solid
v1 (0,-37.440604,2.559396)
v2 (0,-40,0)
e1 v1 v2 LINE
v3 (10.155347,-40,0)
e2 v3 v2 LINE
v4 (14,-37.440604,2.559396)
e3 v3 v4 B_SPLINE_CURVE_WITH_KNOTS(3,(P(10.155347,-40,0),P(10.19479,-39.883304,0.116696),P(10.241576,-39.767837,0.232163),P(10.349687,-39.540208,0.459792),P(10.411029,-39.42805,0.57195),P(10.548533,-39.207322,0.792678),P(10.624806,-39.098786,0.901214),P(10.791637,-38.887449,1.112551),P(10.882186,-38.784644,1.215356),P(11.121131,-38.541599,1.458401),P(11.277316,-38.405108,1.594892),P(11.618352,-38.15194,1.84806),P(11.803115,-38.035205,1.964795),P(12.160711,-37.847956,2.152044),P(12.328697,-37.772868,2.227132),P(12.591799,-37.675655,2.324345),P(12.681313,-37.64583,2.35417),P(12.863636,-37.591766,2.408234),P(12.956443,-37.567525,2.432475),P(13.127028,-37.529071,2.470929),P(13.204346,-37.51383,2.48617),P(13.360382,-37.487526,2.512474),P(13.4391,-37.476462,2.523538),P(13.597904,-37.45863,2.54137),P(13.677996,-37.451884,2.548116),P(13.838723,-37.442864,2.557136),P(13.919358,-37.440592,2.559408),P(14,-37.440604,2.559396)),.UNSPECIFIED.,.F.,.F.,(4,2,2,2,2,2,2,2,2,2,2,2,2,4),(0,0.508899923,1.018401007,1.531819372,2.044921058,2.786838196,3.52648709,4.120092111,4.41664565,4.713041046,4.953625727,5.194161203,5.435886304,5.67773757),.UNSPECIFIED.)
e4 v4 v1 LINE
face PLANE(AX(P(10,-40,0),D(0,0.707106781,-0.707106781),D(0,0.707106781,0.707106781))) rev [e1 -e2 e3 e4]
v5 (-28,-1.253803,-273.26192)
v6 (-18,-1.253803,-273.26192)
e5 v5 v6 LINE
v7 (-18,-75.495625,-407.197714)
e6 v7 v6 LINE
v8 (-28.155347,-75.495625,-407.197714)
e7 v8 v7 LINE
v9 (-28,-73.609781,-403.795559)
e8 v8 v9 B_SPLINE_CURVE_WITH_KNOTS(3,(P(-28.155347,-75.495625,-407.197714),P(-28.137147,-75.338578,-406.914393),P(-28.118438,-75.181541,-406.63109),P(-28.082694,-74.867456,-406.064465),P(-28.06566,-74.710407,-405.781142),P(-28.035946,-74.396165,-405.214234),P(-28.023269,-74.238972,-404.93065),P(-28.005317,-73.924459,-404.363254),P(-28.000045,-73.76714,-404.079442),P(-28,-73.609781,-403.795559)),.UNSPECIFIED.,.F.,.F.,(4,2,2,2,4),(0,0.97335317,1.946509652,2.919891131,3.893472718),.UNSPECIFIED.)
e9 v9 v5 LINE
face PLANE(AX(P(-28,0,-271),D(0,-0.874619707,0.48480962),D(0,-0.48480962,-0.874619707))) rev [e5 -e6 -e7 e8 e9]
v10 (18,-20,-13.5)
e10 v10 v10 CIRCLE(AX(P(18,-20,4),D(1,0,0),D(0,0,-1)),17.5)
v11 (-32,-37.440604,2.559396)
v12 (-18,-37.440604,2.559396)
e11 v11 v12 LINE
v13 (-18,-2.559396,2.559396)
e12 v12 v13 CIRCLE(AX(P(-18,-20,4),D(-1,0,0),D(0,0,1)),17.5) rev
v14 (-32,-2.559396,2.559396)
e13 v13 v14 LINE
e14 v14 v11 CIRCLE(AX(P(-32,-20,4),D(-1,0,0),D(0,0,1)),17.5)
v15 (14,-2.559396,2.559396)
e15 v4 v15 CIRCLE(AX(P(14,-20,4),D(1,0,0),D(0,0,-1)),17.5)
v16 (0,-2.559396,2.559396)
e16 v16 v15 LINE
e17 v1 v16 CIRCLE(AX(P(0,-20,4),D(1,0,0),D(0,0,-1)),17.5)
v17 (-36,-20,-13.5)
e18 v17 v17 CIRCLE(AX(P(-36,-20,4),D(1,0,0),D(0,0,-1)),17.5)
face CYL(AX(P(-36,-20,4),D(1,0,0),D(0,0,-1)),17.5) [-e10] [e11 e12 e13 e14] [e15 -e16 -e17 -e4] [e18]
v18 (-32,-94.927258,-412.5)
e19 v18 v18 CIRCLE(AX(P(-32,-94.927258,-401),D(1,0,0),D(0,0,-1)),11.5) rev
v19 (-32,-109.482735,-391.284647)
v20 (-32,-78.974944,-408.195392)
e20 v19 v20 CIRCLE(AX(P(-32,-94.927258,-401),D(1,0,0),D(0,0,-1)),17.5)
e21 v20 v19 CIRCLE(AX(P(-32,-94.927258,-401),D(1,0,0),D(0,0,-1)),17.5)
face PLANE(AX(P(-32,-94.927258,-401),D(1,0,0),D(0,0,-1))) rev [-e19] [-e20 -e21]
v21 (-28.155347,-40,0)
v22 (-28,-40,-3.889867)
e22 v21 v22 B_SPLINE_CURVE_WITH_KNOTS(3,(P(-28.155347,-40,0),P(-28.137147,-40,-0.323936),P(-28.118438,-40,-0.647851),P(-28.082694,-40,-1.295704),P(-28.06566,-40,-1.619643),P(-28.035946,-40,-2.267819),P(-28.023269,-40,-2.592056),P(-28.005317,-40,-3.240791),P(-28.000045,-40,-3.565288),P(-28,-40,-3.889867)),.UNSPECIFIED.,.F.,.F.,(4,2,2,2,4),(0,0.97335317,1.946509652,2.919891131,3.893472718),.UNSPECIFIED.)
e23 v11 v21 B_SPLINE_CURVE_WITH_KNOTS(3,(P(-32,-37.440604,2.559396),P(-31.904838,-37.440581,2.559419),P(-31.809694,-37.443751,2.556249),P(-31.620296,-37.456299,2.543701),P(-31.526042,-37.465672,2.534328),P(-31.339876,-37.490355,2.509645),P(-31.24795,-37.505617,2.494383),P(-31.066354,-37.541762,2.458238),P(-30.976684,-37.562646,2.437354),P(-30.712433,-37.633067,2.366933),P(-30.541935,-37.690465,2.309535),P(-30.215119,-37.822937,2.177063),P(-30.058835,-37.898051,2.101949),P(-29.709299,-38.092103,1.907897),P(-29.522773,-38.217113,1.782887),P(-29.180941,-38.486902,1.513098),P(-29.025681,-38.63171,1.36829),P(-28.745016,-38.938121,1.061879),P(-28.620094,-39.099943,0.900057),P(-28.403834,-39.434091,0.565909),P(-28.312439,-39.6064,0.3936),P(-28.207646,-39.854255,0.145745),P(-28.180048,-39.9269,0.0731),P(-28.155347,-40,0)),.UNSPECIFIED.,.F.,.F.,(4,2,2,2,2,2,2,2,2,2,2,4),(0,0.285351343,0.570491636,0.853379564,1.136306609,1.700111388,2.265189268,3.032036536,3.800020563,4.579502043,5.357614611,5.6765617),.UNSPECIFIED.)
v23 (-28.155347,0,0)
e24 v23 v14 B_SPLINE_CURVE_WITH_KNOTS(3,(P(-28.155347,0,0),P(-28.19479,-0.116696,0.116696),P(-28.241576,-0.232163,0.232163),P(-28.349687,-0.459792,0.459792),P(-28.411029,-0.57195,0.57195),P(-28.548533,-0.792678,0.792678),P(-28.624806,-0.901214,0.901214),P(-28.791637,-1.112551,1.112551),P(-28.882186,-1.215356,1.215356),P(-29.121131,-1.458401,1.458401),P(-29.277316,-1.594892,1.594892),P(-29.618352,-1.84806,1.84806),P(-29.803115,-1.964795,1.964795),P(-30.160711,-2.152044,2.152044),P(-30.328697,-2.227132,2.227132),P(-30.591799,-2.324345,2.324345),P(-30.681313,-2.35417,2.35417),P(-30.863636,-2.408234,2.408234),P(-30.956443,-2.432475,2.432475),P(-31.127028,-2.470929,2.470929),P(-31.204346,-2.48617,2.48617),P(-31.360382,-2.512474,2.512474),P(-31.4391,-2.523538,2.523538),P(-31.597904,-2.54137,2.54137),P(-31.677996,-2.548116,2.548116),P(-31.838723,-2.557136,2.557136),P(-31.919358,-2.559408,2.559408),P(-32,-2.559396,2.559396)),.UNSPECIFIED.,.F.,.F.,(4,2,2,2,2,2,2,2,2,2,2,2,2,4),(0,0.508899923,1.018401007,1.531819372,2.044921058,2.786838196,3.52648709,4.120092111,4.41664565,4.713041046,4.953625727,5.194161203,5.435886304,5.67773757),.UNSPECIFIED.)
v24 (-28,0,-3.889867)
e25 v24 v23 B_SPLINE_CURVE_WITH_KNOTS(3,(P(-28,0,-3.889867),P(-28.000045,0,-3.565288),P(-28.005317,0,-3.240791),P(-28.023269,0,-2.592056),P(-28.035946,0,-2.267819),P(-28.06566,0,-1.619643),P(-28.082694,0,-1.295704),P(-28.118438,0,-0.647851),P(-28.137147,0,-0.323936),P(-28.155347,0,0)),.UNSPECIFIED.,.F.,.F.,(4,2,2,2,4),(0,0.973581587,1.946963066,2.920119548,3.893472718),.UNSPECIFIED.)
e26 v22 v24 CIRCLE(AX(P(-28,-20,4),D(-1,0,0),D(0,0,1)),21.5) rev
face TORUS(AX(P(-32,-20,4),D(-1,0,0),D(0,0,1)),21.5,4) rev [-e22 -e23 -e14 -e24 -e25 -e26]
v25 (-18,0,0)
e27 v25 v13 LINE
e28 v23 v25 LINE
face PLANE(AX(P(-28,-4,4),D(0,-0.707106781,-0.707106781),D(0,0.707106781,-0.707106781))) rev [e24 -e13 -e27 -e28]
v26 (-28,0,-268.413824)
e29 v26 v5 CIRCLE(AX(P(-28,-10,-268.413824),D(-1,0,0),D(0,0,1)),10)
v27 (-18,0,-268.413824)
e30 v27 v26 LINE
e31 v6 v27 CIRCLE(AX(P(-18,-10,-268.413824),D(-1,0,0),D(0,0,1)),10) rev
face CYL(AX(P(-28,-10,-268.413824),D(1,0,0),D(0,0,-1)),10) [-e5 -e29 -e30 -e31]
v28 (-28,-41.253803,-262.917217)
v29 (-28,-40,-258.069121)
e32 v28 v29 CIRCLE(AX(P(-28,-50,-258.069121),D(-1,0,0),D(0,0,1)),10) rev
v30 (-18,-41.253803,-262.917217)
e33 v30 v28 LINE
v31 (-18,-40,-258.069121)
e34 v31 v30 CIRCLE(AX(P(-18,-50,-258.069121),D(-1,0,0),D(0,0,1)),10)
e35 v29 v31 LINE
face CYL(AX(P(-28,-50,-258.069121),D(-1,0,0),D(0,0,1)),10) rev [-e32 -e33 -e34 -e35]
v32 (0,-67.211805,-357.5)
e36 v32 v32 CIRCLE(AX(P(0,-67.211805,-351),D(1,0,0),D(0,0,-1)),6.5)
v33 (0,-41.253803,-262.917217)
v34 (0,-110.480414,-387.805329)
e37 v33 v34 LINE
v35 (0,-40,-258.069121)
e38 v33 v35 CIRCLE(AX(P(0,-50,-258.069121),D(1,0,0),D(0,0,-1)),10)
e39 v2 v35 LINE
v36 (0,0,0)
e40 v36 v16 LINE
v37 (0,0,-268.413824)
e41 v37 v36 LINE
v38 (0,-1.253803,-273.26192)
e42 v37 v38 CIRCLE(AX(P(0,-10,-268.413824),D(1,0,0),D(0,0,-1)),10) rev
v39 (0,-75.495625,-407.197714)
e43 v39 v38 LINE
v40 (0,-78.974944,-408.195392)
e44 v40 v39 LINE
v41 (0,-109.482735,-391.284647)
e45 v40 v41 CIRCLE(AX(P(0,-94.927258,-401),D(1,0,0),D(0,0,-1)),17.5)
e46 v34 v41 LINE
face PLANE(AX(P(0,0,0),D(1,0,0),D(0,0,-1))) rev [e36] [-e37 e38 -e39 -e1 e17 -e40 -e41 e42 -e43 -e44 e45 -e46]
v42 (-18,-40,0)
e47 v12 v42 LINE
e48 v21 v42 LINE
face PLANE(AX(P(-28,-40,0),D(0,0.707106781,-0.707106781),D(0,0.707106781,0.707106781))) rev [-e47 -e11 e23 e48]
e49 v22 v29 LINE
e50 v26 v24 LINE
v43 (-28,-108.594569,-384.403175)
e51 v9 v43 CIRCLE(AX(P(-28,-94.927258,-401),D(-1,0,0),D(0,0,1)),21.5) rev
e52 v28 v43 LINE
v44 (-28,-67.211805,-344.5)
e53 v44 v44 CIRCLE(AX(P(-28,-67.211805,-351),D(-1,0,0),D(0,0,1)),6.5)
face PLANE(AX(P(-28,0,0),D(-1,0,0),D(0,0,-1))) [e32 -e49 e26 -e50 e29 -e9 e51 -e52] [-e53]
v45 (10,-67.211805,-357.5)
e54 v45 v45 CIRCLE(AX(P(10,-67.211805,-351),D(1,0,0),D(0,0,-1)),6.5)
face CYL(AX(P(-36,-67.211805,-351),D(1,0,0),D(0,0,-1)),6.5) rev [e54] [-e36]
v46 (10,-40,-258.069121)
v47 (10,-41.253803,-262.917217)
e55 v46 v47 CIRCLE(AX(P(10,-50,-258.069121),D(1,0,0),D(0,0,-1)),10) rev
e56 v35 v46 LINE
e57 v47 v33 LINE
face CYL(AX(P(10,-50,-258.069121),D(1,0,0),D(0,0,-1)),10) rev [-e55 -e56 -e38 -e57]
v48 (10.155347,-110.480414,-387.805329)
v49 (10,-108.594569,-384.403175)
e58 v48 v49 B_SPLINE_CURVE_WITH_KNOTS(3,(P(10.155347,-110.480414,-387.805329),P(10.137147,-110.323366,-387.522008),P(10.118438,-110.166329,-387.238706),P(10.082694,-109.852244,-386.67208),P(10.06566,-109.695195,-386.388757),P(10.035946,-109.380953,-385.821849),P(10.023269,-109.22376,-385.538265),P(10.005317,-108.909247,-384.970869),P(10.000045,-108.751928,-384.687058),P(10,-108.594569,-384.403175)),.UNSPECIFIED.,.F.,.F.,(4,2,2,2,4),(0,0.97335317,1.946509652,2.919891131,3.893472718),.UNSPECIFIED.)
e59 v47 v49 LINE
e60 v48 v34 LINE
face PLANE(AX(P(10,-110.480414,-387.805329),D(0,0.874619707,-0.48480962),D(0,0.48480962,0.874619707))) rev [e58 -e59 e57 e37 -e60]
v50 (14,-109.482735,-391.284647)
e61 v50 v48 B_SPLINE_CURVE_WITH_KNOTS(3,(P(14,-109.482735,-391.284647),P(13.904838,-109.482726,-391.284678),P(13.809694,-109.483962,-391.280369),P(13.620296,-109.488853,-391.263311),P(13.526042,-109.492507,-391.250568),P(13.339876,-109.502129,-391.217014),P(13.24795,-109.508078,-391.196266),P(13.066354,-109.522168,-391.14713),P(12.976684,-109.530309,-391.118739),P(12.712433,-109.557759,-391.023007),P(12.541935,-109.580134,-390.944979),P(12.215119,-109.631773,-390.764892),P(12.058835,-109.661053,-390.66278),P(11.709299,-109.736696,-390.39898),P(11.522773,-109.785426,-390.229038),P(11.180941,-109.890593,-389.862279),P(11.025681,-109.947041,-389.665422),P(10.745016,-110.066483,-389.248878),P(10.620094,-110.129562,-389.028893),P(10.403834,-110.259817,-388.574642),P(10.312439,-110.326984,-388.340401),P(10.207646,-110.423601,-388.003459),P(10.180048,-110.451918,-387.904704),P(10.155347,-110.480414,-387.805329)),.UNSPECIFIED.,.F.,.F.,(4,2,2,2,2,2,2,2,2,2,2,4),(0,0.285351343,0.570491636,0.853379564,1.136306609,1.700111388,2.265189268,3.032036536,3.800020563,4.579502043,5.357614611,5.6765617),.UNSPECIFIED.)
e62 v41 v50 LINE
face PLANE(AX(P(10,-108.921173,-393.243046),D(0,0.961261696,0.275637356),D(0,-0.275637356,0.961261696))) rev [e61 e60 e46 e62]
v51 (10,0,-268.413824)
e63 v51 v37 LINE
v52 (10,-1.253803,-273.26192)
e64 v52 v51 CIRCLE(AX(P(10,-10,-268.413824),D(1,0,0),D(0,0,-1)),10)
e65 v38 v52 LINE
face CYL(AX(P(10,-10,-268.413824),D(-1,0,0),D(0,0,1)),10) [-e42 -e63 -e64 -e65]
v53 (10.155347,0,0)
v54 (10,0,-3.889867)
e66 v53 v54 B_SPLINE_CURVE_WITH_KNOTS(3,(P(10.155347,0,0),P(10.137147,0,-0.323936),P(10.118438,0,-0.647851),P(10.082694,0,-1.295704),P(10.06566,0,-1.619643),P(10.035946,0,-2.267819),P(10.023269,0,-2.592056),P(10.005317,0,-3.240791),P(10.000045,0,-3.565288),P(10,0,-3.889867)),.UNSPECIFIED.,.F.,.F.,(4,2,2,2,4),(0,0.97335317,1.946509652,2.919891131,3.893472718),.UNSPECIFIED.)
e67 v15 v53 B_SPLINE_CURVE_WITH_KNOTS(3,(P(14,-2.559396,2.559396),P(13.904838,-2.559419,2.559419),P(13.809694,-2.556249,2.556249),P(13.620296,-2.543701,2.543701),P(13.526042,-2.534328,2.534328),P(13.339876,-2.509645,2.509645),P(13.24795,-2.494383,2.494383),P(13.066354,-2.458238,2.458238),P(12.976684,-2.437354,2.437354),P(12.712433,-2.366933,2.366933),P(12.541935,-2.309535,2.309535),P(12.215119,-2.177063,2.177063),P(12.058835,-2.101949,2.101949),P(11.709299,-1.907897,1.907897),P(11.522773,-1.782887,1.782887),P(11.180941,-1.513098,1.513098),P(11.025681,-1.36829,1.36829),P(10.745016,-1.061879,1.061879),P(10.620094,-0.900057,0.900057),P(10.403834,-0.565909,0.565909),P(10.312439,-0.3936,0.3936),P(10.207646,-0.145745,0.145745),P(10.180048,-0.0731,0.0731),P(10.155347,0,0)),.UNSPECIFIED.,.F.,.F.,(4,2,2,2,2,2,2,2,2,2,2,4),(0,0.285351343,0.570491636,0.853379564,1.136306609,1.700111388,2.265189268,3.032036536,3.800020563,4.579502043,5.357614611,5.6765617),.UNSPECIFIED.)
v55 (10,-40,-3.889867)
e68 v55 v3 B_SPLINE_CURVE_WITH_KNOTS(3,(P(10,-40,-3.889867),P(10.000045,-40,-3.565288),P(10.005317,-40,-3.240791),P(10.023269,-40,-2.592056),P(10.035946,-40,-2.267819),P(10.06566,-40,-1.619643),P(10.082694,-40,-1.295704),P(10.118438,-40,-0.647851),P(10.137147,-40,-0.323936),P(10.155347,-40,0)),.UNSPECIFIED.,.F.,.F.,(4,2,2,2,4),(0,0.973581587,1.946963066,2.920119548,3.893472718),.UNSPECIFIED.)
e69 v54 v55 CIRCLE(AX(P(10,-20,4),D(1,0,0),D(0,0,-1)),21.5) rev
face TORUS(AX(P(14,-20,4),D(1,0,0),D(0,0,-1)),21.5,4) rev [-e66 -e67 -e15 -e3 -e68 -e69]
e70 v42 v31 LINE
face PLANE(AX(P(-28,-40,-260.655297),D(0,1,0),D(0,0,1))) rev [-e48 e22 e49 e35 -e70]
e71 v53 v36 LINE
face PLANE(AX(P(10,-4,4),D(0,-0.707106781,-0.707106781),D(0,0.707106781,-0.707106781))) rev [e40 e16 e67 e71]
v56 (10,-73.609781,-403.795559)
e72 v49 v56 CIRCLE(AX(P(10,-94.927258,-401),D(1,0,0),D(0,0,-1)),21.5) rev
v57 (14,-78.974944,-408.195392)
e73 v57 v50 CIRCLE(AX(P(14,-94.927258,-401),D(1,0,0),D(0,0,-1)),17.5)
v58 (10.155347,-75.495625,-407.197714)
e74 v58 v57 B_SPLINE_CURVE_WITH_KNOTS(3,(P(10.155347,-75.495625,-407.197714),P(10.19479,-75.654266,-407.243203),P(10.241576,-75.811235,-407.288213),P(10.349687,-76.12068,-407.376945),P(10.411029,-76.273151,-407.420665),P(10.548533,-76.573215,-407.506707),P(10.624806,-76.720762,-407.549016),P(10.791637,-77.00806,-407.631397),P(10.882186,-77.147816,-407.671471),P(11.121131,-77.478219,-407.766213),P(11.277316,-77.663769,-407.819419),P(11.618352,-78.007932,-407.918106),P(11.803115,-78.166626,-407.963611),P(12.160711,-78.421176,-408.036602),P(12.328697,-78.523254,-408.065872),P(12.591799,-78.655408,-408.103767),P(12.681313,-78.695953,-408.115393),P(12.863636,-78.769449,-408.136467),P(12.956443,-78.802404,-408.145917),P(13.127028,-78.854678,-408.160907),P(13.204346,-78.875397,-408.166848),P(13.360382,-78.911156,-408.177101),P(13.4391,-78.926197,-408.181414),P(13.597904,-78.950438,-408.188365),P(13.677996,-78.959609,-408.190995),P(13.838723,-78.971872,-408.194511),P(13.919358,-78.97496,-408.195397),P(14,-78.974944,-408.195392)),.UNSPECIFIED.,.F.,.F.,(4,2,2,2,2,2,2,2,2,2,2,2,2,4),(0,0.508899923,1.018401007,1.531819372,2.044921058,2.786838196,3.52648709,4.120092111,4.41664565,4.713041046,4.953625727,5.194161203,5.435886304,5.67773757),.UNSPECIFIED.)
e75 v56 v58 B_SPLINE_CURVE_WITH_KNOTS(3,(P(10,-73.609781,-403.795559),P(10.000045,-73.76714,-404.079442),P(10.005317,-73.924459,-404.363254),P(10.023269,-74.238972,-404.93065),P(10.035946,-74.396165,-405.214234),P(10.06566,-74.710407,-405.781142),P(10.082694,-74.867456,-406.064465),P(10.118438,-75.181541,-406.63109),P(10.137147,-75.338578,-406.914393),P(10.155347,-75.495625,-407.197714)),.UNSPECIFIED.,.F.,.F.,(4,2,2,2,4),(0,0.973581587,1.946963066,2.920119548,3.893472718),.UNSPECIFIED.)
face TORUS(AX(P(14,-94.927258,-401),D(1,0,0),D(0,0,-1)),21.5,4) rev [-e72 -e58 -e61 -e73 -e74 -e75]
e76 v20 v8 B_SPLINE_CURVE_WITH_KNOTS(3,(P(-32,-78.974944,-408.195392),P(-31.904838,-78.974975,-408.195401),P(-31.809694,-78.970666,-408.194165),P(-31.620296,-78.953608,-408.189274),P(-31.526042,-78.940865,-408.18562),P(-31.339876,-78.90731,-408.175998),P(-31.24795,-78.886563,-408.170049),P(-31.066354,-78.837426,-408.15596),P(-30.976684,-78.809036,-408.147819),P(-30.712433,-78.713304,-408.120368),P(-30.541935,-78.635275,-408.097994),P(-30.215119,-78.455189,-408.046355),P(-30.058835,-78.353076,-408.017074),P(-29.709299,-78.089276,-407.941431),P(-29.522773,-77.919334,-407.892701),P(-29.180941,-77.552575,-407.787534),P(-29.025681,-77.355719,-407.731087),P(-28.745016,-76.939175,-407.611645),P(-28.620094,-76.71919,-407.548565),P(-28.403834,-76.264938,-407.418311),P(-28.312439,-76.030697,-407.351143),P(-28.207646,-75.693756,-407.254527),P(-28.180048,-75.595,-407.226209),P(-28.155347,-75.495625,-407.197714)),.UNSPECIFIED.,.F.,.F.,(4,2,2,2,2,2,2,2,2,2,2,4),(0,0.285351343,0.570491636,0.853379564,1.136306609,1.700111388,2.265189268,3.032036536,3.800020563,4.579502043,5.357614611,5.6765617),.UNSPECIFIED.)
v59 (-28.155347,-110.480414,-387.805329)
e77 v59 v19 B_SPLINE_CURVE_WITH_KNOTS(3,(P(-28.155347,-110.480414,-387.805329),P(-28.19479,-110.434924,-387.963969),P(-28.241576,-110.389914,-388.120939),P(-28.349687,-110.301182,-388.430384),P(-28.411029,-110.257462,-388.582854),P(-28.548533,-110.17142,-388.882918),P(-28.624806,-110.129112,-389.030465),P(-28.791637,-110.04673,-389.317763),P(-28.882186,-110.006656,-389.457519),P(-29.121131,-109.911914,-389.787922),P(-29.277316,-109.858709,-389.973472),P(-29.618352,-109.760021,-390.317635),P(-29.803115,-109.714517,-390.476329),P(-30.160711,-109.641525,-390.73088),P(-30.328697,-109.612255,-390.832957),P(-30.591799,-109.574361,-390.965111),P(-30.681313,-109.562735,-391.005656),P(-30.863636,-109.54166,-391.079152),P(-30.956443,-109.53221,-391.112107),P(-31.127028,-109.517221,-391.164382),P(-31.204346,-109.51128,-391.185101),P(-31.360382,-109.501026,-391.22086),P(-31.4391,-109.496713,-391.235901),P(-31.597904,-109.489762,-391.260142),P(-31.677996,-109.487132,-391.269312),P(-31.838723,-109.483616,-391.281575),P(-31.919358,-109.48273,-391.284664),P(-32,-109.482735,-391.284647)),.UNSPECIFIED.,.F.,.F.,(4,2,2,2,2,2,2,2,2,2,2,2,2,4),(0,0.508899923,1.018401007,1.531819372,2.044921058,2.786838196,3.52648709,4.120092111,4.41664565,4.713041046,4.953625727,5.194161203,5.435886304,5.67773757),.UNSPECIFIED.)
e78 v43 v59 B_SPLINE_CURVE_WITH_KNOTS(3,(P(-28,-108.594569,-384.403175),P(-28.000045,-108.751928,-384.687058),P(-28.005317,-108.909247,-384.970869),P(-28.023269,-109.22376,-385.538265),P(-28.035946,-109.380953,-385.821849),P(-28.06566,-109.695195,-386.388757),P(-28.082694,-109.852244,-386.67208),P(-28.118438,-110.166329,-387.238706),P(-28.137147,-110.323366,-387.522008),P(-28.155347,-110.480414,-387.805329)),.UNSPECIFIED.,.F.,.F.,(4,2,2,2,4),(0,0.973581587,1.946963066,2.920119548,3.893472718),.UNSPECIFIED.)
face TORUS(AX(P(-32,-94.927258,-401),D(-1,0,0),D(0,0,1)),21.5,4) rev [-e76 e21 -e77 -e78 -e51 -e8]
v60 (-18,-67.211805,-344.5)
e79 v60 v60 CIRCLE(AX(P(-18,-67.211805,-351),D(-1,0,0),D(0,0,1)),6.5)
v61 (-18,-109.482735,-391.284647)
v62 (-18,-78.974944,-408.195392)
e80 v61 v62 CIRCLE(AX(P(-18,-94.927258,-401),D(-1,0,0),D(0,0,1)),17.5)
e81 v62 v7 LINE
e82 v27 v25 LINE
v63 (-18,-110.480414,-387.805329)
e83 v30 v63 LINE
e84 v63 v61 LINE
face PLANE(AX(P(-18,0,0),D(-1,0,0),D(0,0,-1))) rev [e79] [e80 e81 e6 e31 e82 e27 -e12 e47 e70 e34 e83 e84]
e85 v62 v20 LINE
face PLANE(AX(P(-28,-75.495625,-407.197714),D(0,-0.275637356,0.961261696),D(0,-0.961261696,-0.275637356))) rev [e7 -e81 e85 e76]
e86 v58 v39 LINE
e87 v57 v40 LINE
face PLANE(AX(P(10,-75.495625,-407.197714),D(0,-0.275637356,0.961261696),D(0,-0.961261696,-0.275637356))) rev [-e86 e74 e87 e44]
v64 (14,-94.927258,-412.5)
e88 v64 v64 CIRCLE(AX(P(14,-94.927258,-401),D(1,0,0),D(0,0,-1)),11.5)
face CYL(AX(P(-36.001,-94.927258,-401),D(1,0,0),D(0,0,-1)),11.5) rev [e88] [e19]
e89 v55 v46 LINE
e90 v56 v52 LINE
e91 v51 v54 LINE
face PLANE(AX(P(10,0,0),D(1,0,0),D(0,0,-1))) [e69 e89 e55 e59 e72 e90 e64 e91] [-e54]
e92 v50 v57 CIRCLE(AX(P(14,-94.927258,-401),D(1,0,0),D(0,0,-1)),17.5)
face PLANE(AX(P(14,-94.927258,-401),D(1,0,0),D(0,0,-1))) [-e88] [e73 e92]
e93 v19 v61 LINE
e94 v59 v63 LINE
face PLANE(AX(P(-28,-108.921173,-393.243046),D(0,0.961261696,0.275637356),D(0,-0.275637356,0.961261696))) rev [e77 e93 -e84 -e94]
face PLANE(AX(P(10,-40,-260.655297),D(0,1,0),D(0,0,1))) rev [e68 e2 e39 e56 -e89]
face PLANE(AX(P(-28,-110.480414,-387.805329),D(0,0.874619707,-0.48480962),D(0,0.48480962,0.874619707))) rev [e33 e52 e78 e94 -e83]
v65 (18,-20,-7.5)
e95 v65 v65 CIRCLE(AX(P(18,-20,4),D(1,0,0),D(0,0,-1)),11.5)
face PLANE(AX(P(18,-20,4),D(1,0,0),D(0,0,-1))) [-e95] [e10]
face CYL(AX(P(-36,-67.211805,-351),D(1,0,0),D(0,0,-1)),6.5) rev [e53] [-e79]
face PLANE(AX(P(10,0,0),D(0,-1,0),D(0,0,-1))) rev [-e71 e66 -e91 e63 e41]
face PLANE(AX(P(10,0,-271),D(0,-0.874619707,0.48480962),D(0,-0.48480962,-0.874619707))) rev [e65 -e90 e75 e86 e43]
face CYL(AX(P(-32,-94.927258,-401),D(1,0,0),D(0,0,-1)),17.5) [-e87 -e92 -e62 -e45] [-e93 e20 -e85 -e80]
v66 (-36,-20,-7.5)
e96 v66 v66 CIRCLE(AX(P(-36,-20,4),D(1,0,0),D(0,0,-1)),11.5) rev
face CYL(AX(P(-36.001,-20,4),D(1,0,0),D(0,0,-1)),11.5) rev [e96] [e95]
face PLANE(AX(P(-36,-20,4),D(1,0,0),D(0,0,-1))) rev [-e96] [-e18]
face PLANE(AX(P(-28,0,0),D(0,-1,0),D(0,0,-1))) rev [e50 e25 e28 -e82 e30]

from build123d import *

# Parameters (mm, degrees)
DODANIE_WYCI_GNI_CIE1_DEPTH      = 10
DODANIE_WYCI_GNI_CIE2_DEPTH      = 8
DODANIE_WYCI_GNI_CIE2_DEPTH_BACK = 46
SZKIC2_R                         = 17.5
DODANIE_WYCI_GNI_CIE3_DEPTH      = 4
DODANIE_WYCI_GNI_CIE3_DEPTH_BACK = 42
SZKIC3_R                         = 17.5
WYTNIJ_WYCI_GNI_CIE1_REACH       = 438.69
SZKIC4_R                         = 11.5
WYTNIJ_WYCI_GNI_CIE2_REACH       = 438.213
SZKIC5_R                         = 11.5
ZAOKR_GLENIE1_R                  = 4
ZAOKR_GLENIE2_R                  = 10
SZKIC7_R                         = 6.5
WYTNIJ_WYCI_GNI_CIE3_DEPTH       = 436.773035366


with BuildPart() as part:
    # Szkic1 → Dodanie-wyciągnięcie1 (new body)
    with BuildSketch(Plane(origin=(0, 0, 0), x_dir=(0, 0, -1), z_dir=(1, 0, 0))):
        Polygon((0, 0), (271, 0), (407.197713576, -75.495625423), (408.756953924, -80.933342732), (393.243046076, -108.921173361), (387.805328767, -110.480413708), (260.655296626, -40), (0, -40), (-4, -36), (-4, -4), align=None)
    extrude(amount=DODANIE_WYCI_GNI_CIE1_DEPTH)


with BuildPart() as body_2:
    # Lustro3: mirrored copy
    add(part.part.mirror(Plane.ZY.offset(9)))


with BuildPart() as part_1:
    add(part.part)

    add(body_2.part)  # Dodanie-wyciągnięcie2 merges body 2
    # Szkic2 → Dodanie-wyciągnięcie2 (add, two sides: drawn at the far end of the back side and taken through both)
    with BuildSketch(Plane(origin=(10, 0, 0), x_dir=(0, 0, -1), z_dir=(1, 0, 0)).offset(-DODANIE_WYCI_GNI_CIE2_DEPTH_BACK)):
        with Locations((-4, -20)):
            Circle(SZKIC2_R)
    extrude(amount=DODANIE_WYCI_GNI_CIE2_DEPTH + DODANIE_WYCI_GNI_CIE2_DEPTH_BACK)

    # Szkic3 → Dodanie-wyciągnięcie3 (add, two sides: drawn at the far end of the back side and taken through both)
    with BuildSketch(Plane(origin=(10, 0, 0), x_dir=(0, 0, -1), z_dir=(1, 0, 0)).offset(-DODANIE_WYCI_GNI_CIE3_DEPTH_BACK)):
        with Locations((401, -94.927258046)):
            Circle(SZKIC3_R)
    extrude(amount=DODANIE_WYCI_GNI_CIE3_DEPTH + DODANIE_WYCI_GNI_CIE3_DEPTH_BACK)

    # Szkic4 → Wytnij-wyciągnięcie1 (cut, up to next)
    with BuildSketch(Plane(origin=(18, 0, 0), x_dir=(0, 0, -1), z_dir=(1, 0, 0)), mode=Mode.PRIVATE) as wytnij_wyci_gni_cie1_sk1:
        with Locations((-4, -20)):
            Circle(SZKIC4_R)
    wytnij_wyci_gni_cie1_tool1 = extrude(wytnij_wyci_gni_cie1_sk1.sketch, amount=-WYTNIJ_WYCI_GNI_CIE1_REACH, mode=Mode.PRIVATE) & part_1.part
    add(wytnij_wyci_gni_cie1_tool1.solids().sort_by_distance((18, -20, 4))[0], mode=Mode.SUBTRACT)

    # Szkic5 → Wytnij-wyciągnięcie2 (cut, up to next)
    with BuildSketch(Plane(origin=(14, 0, 0), x_dir=(0, 0, -1), z_dir=(1, 0, 0)), mode=Mode.PRIVATE) as wytnij_wyci_gni_cie2_sk1:
        with Locations((401, -94.927258046)):
            Circle(SZKIC5_R)
    wytnij_wyci_gni_cie2_tool1 = extrude(wytnij_wyci_gni_cie2_sk1.sketch, amount=-WYTNIJ_WYCI_GNI_CIE2_REACH, mode=Mode.PRIVATE) & part_1.part
    add(wytnij_wyci_gni_cie2_tool1.solids().sort_by_distance((14, -94.927258, -401))[0], mode=Mode.SUBTRACT)

    # Zaokrąglenie1
    # the kernel refuses this fillet: 4 mm, written as the material it adds along each edge
    with BuildSketch(Plane(origin=(-28, -94.927258046, -401), x_dir=(0, 0.5436759874947165, -0.8392951927788249), z_dir=(0, -0.8392951927788249, -0.5436759874947165))) as zaokr_glenie1_piece_1_section:
        with BuildLine():
            CenterArc((17.5 + ZAOKR_GLENIE1_R, -ZAOKR_GLENIE1_R), ZAOKR_GLENIE1_R, 90, 90)
            Line((17.5 + ZAOKR_GLENIE1_R, 0), (17.5, 0))
            Line((17.5, 0), (17.5, -ZAOKR_GLENIE1_R))
        make_face()
    zaokr_glenie1_piece_1 = revolve(axis=Axis((-28, -94.927258046, -401), (1, 0, 0)), revolution_arc=236.131536778, mode=Mode.PRIVATE)
    zaokr_glenie1_piece_1 = split(zaokr_glenie1_piece_1, bisect_by=Plane(origin=(-29.129078487, -79.146319532, -408.244533267), z_dir=(0, -0.27563735581700194, 0.9612616959383181)), keep=Keep.TOP, mode=Mode.PRIVATE)
    zaokr_glenie1_piece_1 = split(zaokr_glenie1_piece_1, bisect_by=Plane(origin=(-29.129078487, -109.433594017, -391.456022876), z_dir=(0, 0.961261695938321, 0.2756373558169916)), keep=Keep.TOP, mode=Mode.PRIVATE)
    zaokr_glenie1_piece_1 = split(zaokr_glenie1_piece_1, bisect_by=Plane(origin=(-29.129078487, -103.388095722, -375.010448424), z_dir=(0, 0.8746197071393952, -0.4848096202463382)), keep=Keep.TOP, mode=Mode.PRIVATE)
    zaokr_glenie1_piece_1 = split(zaokr_glenie1_piece_1, bisect_by=Plane(origin=(-29.129078487, -68.403307437, -394.402833234), z_dir=(0, -0.8746197071393943, 0.4848096202463399)), keep=Keep.TOP, mode=Mode.PRIVATE)
    add(zaokr_glenie1_piece_1)
    with BuildSketch(Plane(origin=(-28, -20, 4), x_dir=(0, -0.8826991233352643, 0.469938567967299), z_dir=(0, 0.469938567967299, 0.8826991233352643))) as zaokr_glenie1_piece_2_section:
        with BuildLine():
            CenterArc((17.5 + ZAOKR_GLENIE1_R, -ZAOKR_GLENIE1_R), ZAOKR_GLENIE1_R, 90, 90)
            Line((17.5 + ZAOKR_GLENIE1_R, 0), (17.5, 0))
            Line((17.5, 0), (17.5, -ZAOKR_GLENIE1_R))
        make_face()
    zaokr_glenie1_piece_2 = revolve(axis=Axis((-28, -20, 4), (1, 0, 0)), revolution_arc=118.030308923, mode=Mode.PRIVATE)
    zaokr_glenie1_piece_2 = split(zaokr_glenie1_piece_2, bisect_by=Plane(origin=(-29.137845044, -41.167759306, -1.167759306), z_dir=(0, 0.7071067811865419, -0.7071067811865531)), keep=Keep.TOP, mode=Mode.PRIVATE)
    zaokr_glenie1_piece_2 = split(zaokr_glenie1_piece_2, bisect_by=Plane(origin=(-29.137845044, -40, -9.710667039), z_dir=(0, 1, 0)), keep=Keep.TOP, mode=Mode.PRIVATE)
    add(zaokr_glenie1_piece_2)
    with BuildSketch(Plane(origin=(10, -20, 4), x_dir=(0, -0.8826991233352602, 0.46993856796730693), z_dir=(0, 0.46993856796730693, 0.8826991233352602))) as zaokr_glenie1_piece_3_section:
        with BuildLine():
            CenterArc((17.5 + ZAOKR_GLENIE1_R, ZAOKR_GLENIE1_R), ZAOKR_GLENIE1_R, 180, 90)
            Line((17.5, ZAOKR_GLENIE1_R), (17.5, 0))
            Line((17.5, 0), (17.5 + ZAOKR_GLENIE1_R, 0))
        make_face()
    zaokr_glenie1_piece_3 = revolve(axis=Axis((10, -20, 4), (1, 0, 0)), revolution_arc=118.030308923, mode=Mode.PRIVATE)
    zaokr_glenie1_piece_3 = split(zaokr_glenie1_piece_3, bisect_by=Plane(origin=(11.137845044, -41.167759305, -1.167759305), z_dir=(0, 0.7071067811865419, -0.7071067811865531)), keep=Keep.TOP, mode=Mode.PRIVATE)
    zaokr_glenie1_piece_3 = split(zaokr_glenie1_piece_3, bisect_by=Plane(origin=(11.137845044, -40, -9.710667039), z_dir=(0, 1, 0)), keep=Keep.TOP, mode=Mode.PRIVATE)
    add(zaokr_glenie1_piece_3)
    with BuildSketch(Plane(origin=(10, -94.927258046, -401), x_dir=(0, 0.5436759874947362, -0.8392951927788123), z_dir=(0, -0.8392951927788123, -0.5436759874947362))) as zaokr_glenie1_piece_4_section:
        with BuildLine():
            CenterArc((17.5 + ZAOKR_GLENIE1_R, ZAOKR_GLENIE1_R), ZAOKR_GLENIE1_R, 180, 90)
            Line((17.5, ZAOKR_GLENIE1_R), (17.5, 0))
            Line((17.5, 0), (17.5 + ZAOKR_GLENIE1_R, 0))
        make_face()
    zaokr_glenie1_piece_4 = revolve(axis=Axis((10, -94.927258046, -401), (1, 0, 0)), revolution_arc=236.131536778, mode=Mode.PRIVATE)
    zaokr_glenie1_piece_4 = split(zaokr_glenie1_piece_4, bisect_by=Plane(origin=(11.12907849, -68.403307435, -394.402833232), z_dir=(0, -0.8746197071393943, 0.4848096202463399)), keep=Keep.TOP, mode=Mode.PRIVATE)
    zaokr_glenie1_piece_4 = split(zaokr_glenie1_piece_4, bisect_by=Plane(origin=(11.12907849, -103.388095721, -375.010448422), z_dir=(0, 0.8746197071393952, -0.4848096202463382)), keep=Keep.TOP, mode=Mode.PRIVATE)
    zaokr_glenie1_piece_4 = split(zaokr_glenie1_piece_4, bisect_by=Plane(origin=(11.12907849, -109.433594018, -391.456022874), z_dir=(0, 0.961261695938321, 0.2756373558169916)), keep=Keep.TOP, mode=Mode.PRIVATE)
    zaokr_glenie1_piece_4 = split(zaokr_glenie1_piece_4, bisect_by=Plane(origin=(11.12907849, -79.14631953, -408.244533267), z_dir=(0, -0.27563735581700194, 0.9612616959383181)), keep=Keep.TOP, mode=Mode.PRIVATE)
    add(zaokr_glenie1_piece_4)
    with BuildSketch(Plane(origin=(10, -20, 4), x_dir=(0, 0, -1), z_dir=(0, -1, 0))) as zaokr_glenie1_piece_5_section:
        with BuildLine():
            CenterArc((17.5 + ZAOKR_GLENIE1_R, ZAOKR_GLENIE1_R), ZAOKR_GLENIE1_R, 180, 90)
            Line((17.5, ZAOKR_GLENIE1_R), (17.5, 0))
            Line((17.5, 0), (17.5 + ZAOKR_GLENIE1_R, 0))
        make_face()
    zaokr_glenie1_piece_5 = revolve(axis=Axis((10, -20, 4), (1, 0, 0)), revolution_arc=118.030308923, mode=Mode.PRIVATE)
    zaokr_glenie1_piece_5 = split(zaokr_glenie1_piece_5, bisect_by=Plane(origin=(11.137845049, 0, -9.710667043), z_dir=(0, -1, 0)), keep=Keep.TOP, mode=Mode.PRIVATE)
    zaokr_glenie1_piece_5 = split(zaokr_glenie1_piece_5, bisect_by=Plane(origin=(11.137845049, 1.167759309, -1.167759309), z_dir=(0, -0.7071067811865533, -0.7071067811865418)), keep=Keep.TOP, mode=Mode.PRIVATE)
    add(zaokr_glenie1_piece_5)
    with BuildSketch(Plane(origin=(-28, -20, 4), x_dir=(0, 0, -1), z_dir=(0, -1, 0))) as zaokr_glenie1_piece_6_section:
        with BuildLine():
            CenterArc((17.5 + ZAOKR_GLENIE1_R, -ZAOKR_GLENIE1_R), ZAOKR_GLENIE1_R, 90, 90)
            Line((17.5 + ZAOKR_GLENIE1_R, 0), (17.5, 0))
            Line((17.5, 0), (17.5, -ZAOKR_GLENIE1_R))
        make_face()
    zaokr_glenie1_piece_6 = revolve(axis=Axis((-28, -20, 4), (1, 0, 0)), revolution_arc=118.030308923, mode=Mode.PRIVATE)
    zaokr_glenie1_piece_6 = split(zaokr_glenie1_piece_6, bisect_by=Plane(origin=(-29.137845048, 1.167759309, -1.167759309), z_dir=(0, -0.7071067811865533, -0.7071067811865418)), keep=Keep.TOP, mode=Mode.PRIVATE)
    zaokr_glenie1_piece_6 = split(zaokr_glenie1_piece_6, bisect_by=Plane(origin=(-29.137845048, 0, -9.710667042), z_dir=(0, -1, 0)), keep=Keep.TOP, mode=Mode.PRIVATE)
    add(zaokr_glenie1_piece_6)

    # Zaokrąglenie2
    zaokr_glenie2_edges = [part_1.edges().sort_by_distance(p)[0] for p in [
        (5, 0, -271),
        (5, -40, -260.655296626),
        (-23, -40, -260.655296626),
        (-23, 0, -271),
    ]]
    fillet(zaokr_glenie2_edges, radius=ZAOKR_GLENIE2_R)

    # Szkic7 → Wytnij-wyciągnięcie3 (cut, through all)
    with BuildSketch(Plane(origin=(10, 0, 0), x_dir=(0, 0, -1), z_dir=(1, 0, 0))):
        with Locations(Location((351, -67.211805474, 0), (0, 0, 180))):
            Circle(SZKIC7_R)
    extrude(amount=-WYTNIJ_WYCI_GNI_CIE3_DEPTH, mode=Mode.SUBTRACT)


solid = part_1.part
